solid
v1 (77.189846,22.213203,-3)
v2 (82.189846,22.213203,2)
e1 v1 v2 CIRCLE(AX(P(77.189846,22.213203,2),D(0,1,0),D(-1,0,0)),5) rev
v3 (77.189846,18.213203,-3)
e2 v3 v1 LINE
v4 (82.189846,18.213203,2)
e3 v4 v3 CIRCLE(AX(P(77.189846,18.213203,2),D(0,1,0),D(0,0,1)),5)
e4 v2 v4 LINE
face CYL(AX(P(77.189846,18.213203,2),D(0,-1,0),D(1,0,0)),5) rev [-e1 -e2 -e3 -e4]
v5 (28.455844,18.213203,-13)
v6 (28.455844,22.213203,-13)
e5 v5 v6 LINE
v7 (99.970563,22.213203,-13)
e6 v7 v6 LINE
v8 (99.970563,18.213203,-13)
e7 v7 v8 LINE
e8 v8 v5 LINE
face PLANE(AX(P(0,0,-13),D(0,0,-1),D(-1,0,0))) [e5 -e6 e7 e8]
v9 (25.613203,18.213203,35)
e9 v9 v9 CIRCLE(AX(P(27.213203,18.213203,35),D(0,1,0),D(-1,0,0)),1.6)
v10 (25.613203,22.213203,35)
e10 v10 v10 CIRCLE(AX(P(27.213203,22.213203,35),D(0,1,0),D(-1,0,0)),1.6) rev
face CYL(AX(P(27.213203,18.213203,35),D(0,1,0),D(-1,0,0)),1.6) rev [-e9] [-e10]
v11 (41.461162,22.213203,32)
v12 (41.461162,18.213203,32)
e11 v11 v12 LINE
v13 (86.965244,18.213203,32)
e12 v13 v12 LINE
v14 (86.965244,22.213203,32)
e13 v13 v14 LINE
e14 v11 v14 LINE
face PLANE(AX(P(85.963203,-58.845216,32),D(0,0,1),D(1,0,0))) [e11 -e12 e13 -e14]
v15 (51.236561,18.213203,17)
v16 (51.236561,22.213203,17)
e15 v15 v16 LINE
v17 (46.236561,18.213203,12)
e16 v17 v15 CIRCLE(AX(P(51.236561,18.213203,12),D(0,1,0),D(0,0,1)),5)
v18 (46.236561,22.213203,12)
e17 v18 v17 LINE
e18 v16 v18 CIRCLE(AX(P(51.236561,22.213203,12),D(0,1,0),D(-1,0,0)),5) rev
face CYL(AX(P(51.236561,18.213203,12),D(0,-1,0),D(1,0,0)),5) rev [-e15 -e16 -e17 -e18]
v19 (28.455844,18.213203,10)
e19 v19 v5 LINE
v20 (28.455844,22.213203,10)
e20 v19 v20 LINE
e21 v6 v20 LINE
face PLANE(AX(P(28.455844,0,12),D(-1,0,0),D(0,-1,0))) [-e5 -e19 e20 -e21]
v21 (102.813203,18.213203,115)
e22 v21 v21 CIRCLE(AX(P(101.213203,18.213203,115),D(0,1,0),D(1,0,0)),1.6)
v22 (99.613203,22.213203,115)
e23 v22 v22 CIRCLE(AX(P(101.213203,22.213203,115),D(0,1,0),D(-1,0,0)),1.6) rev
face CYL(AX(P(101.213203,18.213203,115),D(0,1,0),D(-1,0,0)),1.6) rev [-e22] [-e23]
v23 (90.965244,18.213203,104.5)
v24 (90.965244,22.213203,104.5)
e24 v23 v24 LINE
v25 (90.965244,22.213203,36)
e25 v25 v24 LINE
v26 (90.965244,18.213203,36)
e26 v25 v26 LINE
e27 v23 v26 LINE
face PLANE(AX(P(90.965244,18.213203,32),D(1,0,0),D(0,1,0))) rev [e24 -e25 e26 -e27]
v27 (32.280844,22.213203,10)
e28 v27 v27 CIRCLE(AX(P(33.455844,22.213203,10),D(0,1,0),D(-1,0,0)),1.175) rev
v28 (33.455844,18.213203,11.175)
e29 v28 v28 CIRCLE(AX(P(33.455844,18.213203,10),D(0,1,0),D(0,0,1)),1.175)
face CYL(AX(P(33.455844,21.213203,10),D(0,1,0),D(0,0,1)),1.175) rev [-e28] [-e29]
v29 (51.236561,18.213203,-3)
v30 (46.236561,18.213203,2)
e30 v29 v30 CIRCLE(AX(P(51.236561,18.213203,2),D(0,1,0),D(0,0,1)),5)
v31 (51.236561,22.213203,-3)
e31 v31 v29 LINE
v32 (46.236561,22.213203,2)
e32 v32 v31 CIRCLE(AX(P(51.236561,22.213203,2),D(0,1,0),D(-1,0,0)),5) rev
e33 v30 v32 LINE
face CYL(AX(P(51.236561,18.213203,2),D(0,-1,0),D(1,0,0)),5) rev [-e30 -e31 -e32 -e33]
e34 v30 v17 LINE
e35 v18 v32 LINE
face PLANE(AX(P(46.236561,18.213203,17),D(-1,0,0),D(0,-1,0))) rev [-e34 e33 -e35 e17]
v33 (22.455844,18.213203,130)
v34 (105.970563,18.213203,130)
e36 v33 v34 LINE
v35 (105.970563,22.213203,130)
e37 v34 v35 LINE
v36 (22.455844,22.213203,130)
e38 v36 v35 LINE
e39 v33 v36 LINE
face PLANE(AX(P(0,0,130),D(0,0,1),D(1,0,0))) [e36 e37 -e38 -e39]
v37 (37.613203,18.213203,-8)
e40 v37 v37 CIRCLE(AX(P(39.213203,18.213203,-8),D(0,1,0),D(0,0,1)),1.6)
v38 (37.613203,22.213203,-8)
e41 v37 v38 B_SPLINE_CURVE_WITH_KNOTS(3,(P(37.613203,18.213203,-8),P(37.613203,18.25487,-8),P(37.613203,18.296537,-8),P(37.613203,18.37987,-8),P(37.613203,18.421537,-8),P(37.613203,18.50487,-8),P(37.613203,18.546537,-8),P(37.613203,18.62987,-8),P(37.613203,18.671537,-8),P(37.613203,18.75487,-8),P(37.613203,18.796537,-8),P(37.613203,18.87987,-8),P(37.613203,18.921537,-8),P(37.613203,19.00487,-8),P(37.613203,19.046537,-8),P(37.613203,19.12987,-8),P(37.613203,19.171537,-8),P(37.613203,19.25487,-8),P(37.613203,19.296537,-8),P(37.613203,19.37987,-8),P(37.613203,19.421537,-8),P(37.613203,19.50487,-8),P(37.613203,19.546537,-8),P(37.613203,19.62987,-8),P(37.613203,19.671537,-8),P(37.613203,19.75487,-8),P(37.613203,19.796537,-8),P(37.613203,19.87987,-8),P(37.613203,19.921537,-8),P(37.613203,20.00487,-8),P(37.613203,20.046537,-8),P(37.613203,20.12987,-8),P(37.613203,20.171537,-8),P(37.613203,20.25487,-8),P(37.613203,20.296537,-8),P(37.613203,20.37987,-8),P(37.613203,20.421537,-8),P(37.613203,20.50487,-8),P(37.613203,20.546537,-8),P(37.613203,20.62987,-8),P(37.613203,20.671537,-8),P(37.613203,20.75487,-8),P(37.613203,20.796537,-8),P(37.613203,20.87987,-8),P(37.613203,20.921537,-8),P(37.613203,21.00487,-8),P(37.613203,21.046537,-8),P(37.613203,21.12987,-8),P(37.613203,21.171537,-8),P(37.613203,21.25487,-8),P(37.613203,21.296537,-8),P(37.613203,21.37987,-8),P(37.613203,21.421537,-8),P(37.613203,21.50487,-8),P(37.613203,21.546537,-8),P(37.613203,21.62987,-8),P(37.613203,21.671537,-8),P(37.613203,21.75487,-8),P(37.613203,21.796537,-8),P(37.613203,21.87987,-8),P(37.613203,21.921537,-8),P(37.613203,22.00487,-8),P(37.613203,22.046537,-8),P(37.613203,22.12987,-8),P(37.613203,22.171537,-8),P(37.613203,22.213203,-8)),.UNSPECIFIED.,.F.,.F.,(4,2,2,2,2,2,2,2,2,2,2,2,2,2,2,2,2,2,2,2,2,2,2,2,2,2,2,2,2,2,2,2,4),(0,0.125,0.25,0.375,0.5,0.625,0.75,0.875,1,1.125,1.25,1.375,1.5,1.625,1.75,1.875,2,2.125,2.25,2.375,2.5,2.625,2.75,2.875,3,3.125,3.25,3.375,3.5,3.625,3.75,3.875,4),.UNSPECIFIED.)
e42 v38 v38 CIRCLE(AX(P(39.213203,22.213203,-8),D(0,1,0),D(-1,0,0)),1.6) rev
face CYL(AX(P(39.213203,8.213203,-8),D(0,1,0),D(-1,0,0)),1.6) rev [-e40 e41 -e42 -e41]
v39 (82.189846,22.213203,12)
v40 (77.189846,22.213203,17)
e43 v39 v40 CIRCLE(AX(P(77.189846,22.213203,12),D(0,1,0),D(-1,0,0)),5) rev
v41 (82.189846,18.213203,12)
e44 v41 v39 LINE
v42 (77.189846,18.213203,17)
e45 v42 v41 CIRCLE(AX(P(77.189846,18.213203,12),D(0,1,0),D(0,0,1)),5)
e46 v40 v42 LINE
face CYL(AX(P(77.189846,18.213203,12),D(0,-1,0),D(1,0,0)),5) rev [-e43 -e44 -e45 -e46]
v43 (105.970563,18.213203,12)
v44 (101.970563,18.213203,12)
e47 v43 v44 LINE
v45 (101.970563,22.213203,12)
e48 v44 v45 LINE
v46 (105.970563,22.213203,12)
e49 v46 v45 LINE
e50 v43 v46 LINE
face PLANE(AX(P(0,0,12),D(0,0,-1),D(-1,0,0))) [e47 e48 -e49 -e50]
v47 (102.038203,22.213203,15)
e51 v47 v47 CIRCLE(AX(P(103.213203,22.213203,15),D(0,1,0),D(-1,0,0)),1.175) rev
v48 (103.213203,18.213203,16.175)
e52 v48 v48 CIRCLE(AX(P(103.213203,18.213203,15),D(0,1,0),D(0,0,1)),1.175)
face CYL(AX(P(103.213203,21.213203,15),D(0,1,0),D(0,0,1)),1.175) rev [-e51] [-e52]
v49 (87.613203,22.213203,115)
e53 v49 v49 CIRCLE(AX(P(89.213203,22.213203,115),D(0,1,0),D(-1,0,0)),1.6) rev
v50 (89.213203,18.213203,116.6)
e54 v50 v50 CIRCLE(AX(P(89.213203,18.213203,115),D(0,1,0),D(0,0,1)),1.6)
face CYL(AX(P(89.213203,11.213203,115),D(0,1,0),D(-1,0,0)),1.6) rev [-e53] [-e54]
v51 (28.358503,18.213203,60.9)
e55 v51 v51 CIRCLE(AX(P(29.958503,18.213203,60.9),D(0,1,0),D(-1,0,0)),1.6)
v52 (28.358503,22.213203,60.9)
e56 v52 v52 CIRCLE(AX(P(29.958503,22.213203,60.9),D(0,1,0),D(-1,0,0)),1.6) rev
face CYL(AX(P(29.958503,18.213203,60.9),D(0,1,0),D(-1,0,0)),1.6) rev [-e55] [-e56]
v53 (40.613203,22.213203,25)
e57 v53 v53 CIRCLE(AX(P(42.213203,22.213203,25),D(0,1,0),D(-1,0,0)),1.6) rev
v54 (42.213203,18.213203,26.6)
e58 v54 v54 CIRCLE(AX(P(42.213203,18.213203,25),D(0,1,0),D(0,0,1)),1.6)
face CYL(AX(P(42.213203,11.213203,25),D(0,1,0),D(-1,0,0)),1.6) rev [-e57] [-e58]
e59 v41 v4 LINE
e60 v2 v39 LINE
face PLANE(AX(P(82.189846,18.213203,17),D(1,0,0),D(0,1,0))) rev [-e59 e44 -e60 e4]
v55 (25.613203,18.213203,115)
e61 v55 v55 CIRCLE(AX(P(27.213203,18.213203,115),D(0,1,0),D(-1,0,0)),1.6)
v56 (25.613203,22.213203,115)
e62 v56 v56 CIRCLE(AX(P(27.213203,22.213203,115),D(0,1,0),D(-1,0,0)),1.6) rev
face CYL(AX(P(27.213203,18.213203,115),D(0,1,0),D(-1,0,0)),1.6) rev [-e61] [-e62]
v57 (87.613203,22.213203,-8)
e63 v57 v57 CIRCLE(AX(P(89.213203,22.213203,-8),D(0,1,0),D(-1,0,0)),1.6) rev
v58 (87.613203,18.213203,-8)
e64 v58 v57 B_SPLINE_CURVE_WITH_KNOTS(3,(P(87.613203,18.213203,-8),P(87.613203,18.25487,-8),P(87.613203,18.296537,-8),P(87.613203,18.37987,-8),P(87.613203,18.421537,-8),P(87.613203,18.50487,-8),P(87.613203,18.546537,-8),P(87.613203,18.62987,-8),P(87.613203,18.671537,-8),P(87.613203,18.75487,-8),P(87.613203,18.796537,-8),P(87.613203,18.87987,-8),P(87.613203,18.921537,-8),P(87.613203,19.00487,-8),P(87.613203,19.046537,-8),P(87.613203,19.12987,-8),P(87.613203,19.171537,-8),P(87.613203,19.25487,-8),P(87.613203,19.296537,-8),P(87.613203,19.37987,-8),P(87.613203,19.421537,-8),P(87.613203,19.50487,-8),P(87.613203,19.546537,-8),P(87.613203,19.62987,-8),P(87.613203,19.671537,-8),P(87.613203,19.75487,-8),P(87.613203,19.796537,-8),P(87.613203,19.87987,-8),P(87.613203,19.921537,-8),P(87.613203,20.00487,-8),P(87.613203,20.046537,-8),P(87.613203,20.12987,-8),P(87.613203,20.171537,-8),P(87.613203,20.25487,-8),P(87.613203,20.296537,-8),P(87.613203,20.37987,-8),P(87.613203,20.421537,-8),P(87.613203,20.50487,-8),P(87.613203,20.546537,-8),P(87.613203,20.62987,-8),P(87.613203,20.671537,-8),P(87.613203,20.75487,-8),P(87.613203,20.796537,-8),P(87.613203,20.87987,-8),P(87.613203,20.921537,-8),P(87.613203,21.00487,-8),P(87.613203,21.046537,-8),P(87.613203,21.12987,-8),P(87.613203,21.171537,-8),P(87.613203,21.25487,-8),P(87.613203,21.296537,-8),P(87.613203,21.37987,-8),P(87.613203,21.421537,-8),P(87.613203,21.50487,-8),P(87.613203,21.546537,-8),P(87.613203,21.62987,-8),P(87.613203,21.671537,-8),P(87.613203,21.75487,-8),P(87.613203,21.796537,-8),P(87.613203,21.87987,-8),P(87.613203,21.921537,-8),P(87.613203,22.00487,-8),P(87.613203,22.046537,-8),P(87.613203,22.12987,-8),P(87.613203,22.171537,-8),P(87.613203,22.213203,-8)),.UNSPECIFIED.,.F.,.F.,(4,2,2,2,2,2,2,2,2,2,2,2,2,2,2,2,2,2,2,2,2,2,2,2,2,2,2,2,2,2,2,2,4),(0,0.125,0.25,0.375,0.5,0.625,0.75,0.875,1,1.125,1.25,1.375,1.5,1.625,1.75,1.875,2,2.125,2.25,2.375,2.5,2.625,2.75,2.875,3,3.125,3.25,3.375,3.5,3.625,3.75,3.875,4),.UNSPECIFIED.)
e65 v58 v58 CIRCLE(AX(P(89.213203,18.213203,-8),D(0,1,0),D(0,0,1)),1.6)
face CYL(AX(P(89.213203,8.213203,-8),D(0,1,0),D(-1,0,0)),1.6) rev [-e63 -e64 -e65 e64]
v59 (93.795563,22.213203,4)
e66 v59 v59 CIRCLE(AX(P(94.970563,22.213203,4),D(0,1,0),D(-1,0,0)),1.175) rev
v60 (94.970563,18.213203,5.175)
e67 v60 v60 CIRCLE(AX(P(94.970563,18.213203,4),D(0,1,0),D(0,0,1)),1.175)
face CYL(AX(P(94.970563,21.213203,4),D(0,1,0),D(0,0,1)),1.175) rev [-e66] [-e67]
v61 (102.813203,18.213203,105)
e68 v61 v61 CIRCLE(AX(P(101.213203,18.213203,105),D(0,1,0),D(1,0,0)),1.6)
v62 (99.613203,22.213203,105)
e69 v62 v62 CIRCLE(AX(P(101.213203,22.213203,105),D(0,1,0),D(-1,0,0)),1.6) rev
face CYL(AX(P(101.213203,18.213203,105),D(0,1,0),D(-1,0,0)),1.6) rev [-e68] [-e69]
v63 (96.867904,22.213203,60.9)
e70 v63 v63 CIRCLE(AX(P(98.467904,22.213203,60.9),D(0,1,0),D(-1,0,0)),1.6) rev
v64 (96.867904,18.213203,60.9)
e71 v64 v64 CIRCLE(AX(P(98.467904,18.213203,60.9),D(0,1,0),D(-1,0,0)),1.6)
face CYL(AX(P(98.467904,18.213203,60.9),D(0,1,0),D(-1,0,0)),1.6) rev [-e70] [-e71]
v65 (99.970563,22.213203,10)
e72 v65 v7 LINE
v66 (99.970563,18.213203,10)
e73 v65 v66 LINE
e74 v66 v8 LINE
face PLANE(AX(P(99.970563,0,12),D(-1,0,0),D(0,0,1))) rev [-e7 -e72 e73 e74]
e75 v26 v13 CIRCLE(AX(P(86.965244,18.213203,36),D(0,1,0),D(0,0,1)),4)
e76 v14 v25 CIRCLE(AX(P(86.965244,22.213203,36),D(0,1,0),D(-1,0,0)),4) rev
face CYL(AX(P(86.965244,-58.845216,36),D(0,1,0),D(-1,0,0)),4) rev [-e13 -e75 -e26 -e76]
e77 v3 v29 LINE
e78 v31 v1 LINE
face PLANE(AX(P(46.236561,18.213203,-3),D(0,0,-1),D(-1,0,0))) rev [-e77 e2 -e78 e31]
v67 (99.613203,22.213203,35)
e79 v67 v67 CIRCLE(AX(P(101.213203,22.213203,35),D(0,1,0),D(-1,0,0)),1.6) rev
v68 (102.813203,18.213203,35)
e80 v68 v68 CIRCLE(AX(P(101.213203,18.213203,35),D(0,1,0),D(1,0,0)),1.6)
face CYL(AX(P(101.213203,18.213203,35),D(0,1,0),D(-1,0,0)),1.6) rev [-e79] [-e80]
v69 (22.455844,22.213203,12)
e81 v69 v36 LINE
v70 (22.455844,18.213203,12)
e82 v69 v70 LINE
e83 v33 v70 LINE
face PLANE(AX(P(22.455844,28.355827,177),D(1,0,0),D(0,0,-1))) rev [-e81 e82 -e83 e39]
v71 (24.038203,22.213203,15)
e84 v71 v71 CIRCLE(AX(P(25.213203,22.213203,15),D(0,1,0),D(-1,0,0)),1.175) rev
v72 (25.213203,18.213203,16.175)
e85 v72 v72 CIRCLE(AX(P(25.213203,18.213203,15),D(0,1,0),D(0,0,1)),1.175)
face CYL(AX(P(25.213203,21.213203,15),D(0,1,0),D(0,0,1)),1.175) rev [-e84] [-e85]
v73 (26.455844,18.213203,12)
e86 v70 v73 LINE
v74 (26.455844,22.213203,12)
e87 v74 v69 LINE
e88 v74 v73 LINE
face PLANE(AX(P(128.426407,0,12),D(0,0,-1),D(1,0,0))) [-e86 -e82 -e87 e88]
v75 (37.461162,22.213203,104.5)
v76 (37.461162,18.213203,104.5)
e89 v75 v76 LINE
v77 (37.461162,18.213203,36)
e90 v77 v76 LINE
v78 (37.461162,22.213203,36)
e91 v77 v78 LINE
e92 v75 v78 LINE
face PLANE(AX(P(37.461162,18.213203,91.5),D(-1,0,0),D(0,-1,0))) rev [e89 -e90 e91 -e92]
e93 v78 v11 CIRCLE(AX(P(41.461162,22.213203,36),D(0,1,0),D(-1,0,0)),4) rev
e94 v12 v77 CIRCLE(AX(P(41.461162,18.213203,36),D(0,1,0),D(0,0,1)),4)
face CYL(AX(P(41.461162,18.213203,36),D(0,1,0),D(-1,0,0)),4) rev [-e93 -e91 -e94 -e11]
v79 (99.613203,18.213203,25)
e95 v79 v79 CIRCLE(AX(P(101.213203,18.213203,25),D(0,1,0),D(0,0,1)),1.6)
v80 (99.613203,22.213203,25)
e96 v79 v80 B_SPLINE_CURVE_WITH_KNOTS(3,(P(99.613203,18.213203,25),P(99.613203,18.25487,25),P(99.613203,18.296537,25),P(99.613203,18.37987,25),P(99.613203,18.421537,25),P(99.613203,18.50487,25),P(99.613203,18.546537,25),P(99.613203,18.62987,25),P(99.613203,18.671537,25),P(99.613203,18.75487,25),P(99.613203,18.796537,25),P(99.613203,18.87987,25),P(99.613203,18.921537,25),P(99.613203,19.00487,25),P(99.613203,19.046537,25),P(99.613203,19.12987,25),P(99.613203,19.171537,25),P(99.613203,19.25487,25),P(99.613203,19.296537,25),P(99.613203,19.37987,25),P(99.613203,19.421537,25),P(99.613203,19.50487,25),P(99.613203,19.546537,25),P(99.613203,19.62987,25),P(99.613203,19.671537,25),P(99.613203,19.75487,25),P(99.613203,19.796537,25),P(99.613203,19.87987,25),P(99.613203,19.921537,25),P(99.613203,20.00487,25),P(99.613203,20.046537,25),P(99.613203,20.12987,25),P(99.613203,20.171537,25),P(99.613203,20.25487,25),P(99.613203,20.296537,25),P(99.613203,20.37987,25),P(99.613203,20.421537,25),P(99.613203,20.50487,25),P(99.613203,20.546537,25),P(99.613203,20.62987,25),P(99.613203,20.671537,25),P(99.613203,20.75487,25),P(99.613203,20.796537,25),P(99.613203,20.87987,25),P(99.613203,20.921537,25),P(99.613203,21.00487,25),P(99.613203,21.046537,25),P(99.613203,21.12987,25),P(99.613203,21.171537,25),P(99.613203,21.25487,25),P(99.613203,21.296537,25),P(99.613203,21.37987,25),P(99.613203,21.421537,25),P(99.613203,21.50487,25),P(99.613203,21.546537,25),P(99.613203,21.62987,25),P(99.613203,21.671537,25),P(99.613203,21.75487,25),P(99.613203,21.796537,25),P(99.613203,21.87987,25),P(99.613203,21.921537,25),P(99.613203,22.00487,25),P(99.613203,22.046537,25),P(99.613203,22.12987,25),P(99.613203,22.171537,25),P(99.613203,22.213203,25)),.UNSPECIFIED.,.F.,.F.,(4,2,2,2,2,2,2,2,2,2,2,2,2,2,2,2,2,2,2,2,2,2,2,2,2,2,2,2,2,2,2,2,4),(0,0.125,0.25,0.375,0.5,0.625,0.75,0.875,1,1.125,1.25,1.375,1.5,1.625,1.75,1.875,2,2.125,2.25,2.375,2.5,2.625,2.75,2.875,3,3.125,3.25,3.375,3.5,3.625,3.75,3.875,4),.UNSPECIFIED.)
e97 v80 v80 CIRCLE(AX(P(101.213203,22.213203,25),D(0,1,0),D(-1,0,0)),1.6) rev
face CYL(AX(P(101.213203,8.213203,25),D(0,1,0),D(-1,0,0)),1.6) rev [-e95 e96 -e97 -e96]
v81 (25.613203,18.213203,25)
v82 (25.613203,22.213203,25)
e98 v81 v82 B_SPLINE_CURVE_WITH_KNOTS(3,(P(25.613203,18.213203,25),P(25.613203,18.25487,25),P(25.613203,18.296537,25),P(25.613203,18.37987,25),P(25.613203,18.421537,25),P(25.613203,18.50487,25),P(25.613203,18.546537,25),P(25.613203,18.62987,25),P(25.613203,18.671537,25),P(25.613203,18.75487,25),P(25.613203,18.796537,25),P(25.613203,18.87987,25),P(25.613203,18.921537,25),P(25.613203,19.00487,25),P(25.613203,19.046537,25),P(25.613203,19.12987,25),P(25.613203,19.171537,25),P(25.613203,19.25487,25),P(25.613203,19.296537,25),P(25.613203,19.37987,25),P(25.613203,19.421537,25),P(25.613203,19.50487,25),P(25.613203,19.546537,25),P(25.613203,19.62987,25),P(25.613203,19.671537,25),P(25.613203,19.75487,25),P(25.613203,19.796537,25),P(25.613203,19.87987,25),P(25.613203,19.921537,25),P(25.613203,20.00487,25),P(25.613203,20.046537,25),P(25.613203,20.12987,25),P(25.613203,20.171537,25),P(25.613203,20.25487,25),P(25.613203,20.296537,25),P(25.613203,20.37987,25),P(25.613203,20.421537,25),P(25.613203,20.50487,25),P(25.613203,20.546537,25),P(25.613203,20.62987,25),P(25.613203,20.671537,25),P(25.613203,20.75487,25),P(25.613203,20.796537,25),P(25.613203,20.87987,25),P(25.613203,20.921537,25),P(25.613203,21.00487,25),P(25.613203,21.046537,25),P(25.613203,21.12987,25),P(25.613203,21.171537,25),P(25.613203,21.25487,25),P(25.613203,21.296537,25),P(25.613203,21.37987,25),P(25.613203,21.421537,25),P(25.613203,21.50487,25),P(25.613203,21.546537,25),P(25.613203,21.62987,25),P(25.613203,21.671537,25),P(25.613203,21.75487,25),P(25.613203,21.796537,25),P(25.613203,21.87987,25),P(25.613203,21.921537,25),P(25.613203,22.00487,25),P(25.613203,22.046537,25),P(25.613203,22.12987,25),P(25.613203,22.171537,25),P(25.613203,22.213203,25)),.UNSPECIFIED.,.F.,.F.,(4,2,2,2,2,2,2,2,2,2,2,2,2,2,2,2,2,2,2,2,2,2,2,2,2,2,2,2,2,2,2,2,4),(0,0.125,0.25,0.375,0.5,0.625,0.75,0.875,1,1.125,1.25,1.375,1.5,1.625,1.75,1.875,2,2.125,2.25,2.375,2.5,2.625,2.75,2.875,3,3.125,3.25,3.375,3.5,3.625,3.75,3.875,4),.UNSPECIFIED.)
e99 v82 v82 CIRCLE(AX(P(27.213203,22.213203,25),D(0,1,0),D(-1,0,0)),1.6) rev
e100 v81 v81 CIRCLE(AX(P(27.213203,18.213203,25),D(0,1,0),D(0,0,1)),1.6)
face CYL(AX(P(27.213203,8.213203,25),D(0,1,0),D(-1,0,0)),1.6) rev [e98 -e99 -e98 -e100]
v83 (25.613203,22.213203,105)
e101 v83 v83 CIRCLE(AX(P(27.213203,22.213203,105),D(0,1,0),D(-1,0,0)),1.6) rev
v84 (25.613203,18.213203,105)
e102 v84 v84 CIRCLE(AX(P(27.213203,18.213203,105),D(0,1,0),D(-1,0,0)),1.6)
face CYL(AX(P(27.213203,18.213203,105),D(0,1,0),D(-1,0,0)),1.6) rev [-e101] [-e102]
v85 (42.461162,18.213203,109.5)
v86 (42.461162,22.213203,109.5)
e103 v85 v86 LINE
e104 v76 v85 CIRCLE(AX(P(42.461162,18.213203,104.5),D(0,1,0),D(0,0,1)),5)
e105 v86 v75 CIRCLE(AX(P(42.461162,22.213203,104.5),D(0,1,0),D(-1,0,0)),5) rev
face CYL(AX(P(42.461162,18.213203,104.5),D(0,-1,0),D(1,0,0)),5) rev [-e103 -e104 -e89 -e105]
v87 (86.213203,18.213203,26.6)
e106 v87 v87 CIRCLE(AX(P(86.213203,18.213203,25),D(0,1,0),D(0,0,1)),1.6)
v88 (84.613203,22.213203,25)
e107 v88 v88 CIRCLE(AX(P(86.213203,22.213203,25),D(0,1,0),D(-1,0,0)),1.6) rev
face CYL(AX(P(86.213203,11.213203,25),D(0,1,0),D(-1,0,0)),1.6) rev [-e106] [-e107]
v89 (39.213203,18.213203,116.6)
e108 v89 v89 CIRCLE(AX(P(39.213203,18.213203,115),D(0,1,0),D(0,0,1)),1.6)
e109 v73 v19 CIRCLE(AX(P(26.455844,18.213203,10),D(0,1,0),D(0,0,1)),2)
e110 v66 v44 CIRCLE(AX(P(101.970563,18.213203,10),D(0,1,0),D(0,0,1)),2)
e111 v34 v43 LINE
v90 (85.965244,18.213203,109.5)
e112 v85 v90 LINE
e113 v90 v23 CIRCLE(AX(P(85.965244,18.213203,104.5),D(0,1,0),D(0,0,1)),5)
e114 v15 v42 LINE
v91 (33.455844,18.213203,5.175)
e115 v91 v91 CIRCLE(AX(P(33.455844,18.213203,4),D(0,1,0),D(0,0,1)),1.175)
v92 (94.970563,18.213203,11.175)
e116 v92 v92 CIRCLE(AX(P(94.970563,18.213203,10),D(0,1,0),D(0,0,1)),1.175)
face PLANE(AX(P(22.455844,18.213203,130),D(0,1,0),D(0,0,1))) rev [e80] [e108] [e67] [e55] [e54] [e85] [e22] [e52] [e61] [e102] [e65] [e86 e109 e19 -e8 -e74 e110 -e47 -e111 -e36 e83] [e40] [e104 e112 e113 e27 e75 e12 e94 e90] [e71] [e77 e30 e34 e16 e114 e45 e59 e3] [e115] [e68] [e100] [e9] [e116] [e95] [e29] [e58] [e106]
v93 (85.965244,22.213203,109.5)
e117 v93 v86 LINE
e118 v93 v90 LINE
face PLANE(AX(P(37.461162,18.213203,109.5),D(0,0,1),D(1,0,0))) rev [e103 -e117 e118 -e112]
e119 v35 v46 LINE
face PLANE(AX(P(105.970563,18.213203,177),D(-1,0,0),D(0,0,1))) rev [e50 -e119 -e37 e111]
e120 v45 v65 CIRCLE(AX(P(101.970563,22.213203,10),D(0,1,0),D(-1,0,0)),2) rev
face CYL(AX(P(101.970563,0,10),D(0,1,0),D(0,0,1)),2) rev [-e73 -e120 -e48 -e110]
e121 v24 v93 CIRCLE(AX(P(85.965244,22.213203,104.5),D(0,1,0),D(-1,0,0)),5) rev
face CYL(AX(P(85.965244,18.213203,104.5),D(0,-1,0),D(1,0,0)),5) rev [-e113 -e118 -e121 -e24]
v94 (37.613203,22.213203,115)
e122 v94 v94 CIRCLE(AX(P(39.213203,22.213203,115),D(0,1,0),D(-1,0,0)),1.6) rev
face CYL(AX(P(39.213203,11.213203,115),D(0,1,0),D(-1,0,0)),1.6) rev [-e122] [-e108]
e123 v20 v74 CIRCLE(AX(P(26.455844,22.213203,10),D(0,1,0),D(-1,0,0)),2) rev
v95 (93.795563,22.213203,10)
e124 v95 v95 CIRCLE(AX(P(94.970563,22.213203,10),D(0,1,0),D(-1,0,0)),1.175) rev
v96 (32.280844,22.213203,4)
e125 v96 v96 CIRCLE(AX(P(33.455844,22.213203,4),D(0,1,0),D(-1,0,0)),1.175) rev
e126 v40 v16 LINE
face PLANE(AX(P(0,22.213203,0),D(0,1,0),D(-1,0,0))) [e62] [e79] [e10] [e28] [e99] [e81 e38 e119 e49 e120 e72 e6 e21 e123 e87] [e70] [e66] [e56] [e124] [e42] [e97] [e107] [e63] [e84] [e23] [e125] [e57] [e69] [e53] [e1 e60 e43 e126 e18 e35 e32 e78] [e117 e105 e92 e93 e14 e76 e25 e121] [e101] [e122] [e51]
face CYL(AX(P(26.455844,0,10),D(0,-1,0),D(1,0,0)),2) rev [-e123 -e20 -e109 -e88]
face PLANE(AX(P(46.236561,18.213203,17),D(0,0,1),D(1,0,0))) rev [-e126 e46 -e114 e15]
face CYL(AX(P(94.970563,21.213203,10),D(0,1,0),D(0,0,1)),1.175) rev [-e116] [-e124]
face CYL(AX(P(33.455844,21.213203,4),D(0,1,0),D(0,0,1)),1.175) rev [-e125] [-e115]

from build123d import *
from build123d.topology import SkipClean

# Parameters (mm, degrees)
EXTRUDE_1_DEPTH           = 130
HOLE_WIZARD_2_2_2_2_1_D   = 2.2
HOLE_WIZARD_2_2_2_2_2_D   = 2.2
CUT_EXTRUDE_1_DEPTH       = 12
CUT_EXTRUDE_5_DEPTH       = 20
HOLE_WIZARD_2_35_2_35_1_D = 2.35
CUT_EXTRUDE_6_DEPTH       = 10
SKETCH1_W                 = 22.455844123
SKETCH1_H                 = 22.319185646
EXTRUDE1_DEPTH            = 165
SKETCH3_W                 = 71.514718625
SKETCH3_H                 = 3
EXTRUDE3_DEPTH            = 13
SKETCH4_R                 = 1.6
EXTRUDE4_DEPTH            = 13
SKETCH6_R                 = 1.6
EXTRUDE5_DEPTH            = 13
SKETCH_21_R               = 1.6
CUT_EXTRUDE_7_DEPTH       = 10
SKETCH_22_W               = 43.5
SKETCH_22_H               = 65.5
CUT_EXTRUDE_8_DEPTH       = 10
EXTRUDE_3_DEPTH           = 3
FILLET_1_R                = 10
CUT_EXTRUDE_9_DEPTH       = 10
EXTRUDE_START             = -3
SKETCH_25_R               = 1.1
EXTRUDE_4_DEPTH           = 3
FILLET_2_R                = 5
SKETCH_26_W               = 35.953284367
SKETCH_26_H               = 20
CUT_EXTRUDE_10_DEPTH      = 3
FILLET_3_R                = 5
SKETCH_27_R               = 1.6
CUT_EXTRUDE_11_DEPTH      = 3
EXTRUDE_5_DEPTH           = 3
CUT_EXTRUDE_12_DEPTH      = 3
FILLET_4_R                = 4
SKETCH_30_R               = 1.6
CUT_EXTRUDE_13_DEPTH      = 3
SKETCH_31_R               = 1.6
CUT_EXTRUDE_14_DEPTH      = 10
SKETCH_32_W               = 2
SKETCH_32_H               = 20
EXTRUDE_6_DEPTH           = 3
FILLET_5_R                = 5
SKETCH_33_R               = 1.6
CUT_EXTRUDE_15_DEPTH      = 3
SKETCH_34_R               = 1.6
EXTRUDE_7_DEPTH           = 3
EXTRUDE_START_2           = 1
SKETCH_37_R               = 1.175
SKETCH_37_R_2             = 1.6
EXTRUDE_8_DEPTH           = 1
FILLET_6_R                = 2


with BuildPart() as part:
    # 草图1 → 凸台-拉伸1 (new body)
    with BuildSketch(Plane.XY):
        Polygon((21.213203436, 21.213203436), (107.213203436, 21.213203436), (115.213203436, 13.213203436), (110.970562748, 13.213203436), (105.970562748, 18.213203436), (22.455844123, 18.213203436), (17.455844123, 13.213203436), (13.213203436, 13.213203436), align=None)
    extrude(amount=EXTRUDE_1_DEPTH)

    # Ø2.2 (2.2) 直径孔1 (through all)
    with Locations(Plane(origin=(0, 0, 0), x_dir=(0, 0, 1), z_dir=(-0.7071067811865488, 0.7071067811865462, 0))):
        with Locations((65, 25), (25, 25), (105, 25)):
            hole_wizard_2_2_2_2_1 = Hole(HOLE_WIZARD_2_2_2_2_1_D / 2)

    # 镜向1: Ø2.2 (2.2) 直径孔1 across plane
    add(hole_wizard_2_2_2_2_1.mirror(Plane(origin=(64.213203436, 0, 0), x_dir=(0, 0, 1), z_dir=(1, 0, 0))), mode=Mode.SUBTRACT)

    # Ø2.2 (2.2) 直径孔2 (through all)
    with Locations(Plane(origin=(0, 21.213203436, 0), x_dir=(1, 0, 0), z_dir=(0, 1, 0))):
        with Locations((39.213203436, -115), (39.213203436, -75), (89.213203436, -75), (89.213203436, -115)):
            Hole(HOLE_WIZARD_2_2_2_2_2_D / 2)

    # 草图6 → 切除-拉伸1 (cut)
    with BuildSketch(Plane(origin=(0, 0, 0), x_dir=(-1, 0, 0), z_dir=(0, 0, -1))):
        Polygon((-99.970562748, 21.213203436), (-107.213203436, 21.213203436), (-105.970562748, 18.213203436), (-99.970562748, 18.213203436), align=None)
        Polygon((-105.970562748, 18.213203436), (-107.213203436, 21.213203436), (-115.213203436, 13.213203436), (-113.091883092, 11.091883092), align=None)
    cut_extrude_1 = extrude(amount=-CUT_EXTRUDE_1_DEPTH, mode=Mode.SUBTRACT)

    # 草图14 → 切除-拉伸5 (cut)
    with BuildSketch(Plane.XY.offset(130)):
        Polygon((103.970562748, 18.213203436), (103.970562748, 21.213203436), (107.213203436, 21.213203436), (115.213203436, 13.213203436), (110.970562748, 13.213203436), (105.970562748, 18.213203436), align=None)
    cut_extrude_5 = extrude(amount=-CUT_EXTRUDE_5_DEPTH, mode=Mode.SUBTRACT)

    # Ø2.35 (2.35) 直径孔1 (through all)
    with Locations(Plane(origin=(0, 21.213203436, 0), x_dir=(1, 0, 0), z_dir=(0, 1, 0))):
        with Locations((94.970562748, -4), (103.213203436, -15), (94.970562748, -10)):
            hole_wizard_2_35_2_35_1 = Hole(HOLE_WIZARD_2_35_2_35_1_D / 2)

    # 镜向2: 切除-拉伸1, 切除-拉伸5, Ø2.35 (2.35) 直径孔1 across plane
    add(cut_extrude_1.mirror(Plane(origin=(64.213203436, 0, 0), x_dir=(0, 0, 1), z_dir=(1, 0, 0))), mode=Mode.SUBTRACT)
    add(cut_extrude_5.mirror(Plane(origin=(64.213203436, 0, 0), x_dir=(0, 0, 1), z_dir=(1, 0, 0))), mode=Mode.SUBTRACT)
    add(hole_wizard_2_35_2_35_1.mirror(Plane(origin=(64.213203436, 0, 0), x_dir=(0, 0, 1), z_dir=(1, 0, 0))), mode=Mode.SUBTRACT)

    # 草图15 → 切除-拉伸6 (cut)
    with BuildSketch(Plane(origin=(0, 21.213203436, 0), x_dir=(1, 0, 0), z_dir=(0, 1, 0))):
        with BuildLine():
            Line((27.213203436, -18), (101.213203436, -18))
            ThreePointArc((101.213203436, -18), (102.713203436, -19.5), (101.213203436, -21))
            Line((101.213203436, -21), (27.213203436, -21))
            ThreePointArc((27.213203436, -21), (25.713203436, -19.5), (27.213203436, -18))
        make_face()
        with BuildLine():
            Line((27.213203436, -29), (101.213203436, -29))
            ThreePointArc((101.213203436, -29), (102.713203436, -30.5), (101.213203436, -32))
            Line((101.213203436, -32), (27.213203436, -32))
            ThreePointArc((27.213203436, -32), (25.713203436, -30.5), (27.213203436, -29))
        make_face()
        with BuildLine():
            Line((27.213203436, -40), (101.213203436, -40))
            ThreePointArc((101.213203436, -40), (102.713203436, -41.5), (101.213203436, -43))
            Line((101.213203436, -43), (27.213203436, -43))
            ThreePointArc((27.213203436, -43), (25.713203436, -41.5), (27.213203436, -40))
        make_face()
        with BuildLine():
            Line((27.213203436, -51), (101.213203436, -51))
            ThreePointArc((101.213203436, -51), (102.713203436, -52.5), (101.213203436, -54))
            Line((101.213203436, -54), (27.213203436, -54))
            ThreePointArc((27.213203436, -54), (25.713203436, -52.5), (27.213203436, -51))
        make_face()
        with BuildLine():
            Line((27.213203436, -62), (101.213203436, -62))
            ThreePointArc((101.213203436, -62), (102.713203436, -63.5), (101.213203436, -65))
            Line((101.213203436, -65), (27.213203436, -65))
            ThreePointArc((27.213203436, -65), (25.713203436, -63.5), (27.213203436, -62))
        make_face()
        with BuildLine():
            Line((27.213203436, -77.5), (101.213203436, -77.5))
            ThreePointArc((101.213203436, -77.5), (102.713203436, -79), (101.213203436, -80.5))
            Line((101.213203436, -80.5), (27.213203436, -80.5))
            ThreePointArc((27.213203436, -80.5), (25.713203436, -79), (27.213203436, -77.5))
        make_face()
        with BuildLine():
            Line((27.213203436, -91.5), (101.213203436, -91.5))
            ThreePointArc((101.213203436, -91.5), (102.713203436, -93), (101.213203436, -94.5))
            Line((101.213203436, -94.5), (27.213203436, -94.5))
            ThreePointArc((27.213203436, -94.5), (25.713203436, -93), (27.213203436, -91.5))
        make_face()
        with BuildLine():
            Line((27.213203436, -105.5), (101.213203436, -105.5))
            ThreePointArc((101.213203436, -105.5), (102.713203436, -107), (101.213203436, -108.5))
            Line((101.213203436, -108.5), (27.213203436, -108.5))
            ThreePointArc((27.213203436, -108.5), (25.713203436, -107), (27.213203436, -105.5))
        make_face()
    extrude(amount=-CUT_EXTRUDE_6_DEPTH, mode=Mode.SUBTRACT)

    # Sketch1 → Extrude1 (cut)
    with BuildSketch(Plane(origin=(0, 0, 12), x_dir=(-1, 0, 0), z_dir=(0, 0, -1))):
        Polygon((-105.970562748, 18.213203436), (-105.970562748, 28.355826894), (-119.630928902, 28.355826894), (-119.630928902, 18.213203436), (-119.630928902, 5.364047477), (-105.970562748, 5.364047477), align=None)
        with Locations((-11.227922062, 17.196234071)):
            Rectangle(SKETCH1_W, SKETCH1_H)
    extrude(amount=-EXTRUDE1_DEPTH, mode=Mode.SUBTRACT)

    # Sketch3 → Extrude3 (add)
    with BuildSketch(Plane(origin=(0, 0, 0), x_dir=(-1, 0, 0), z_dir=(0, 0, -1))):
        with Locations((-64.213203436, 19.713203436)):
            Rectangle(SKETCH3_W, SKETCH3_H)
    extrude(amount=EXTRUDE3_DEPTH)

    # Sketch4 → Extrude4 (cut)
    with BuildSketch(Plane(origin=(0, 21.213203436, 0), x_dir=(1, 0, 0), z_dir=(0, 1, 0))):
        with Locations(Location((89.213203436, 8, 0), (0, 0, 180))):
            Circle(SKETCH4_R)
        with Locations(Location((39.213203436, 8, 0), (0, 0, 180))):
            Circle(SKETCH4_R)
    extrude(amount=-EXTRUDE4_DEPTH, mode=Mode.SUBTRACT)

    # Sketch6 → Extrude5 (cut)
    with BuildSketch(Plane(origin=(0, 21.213203436, 0), x_dir=(1, 0, 0), z_dir=(0, 1, 0))):
        with Locations(Location((101.213203436, -25, 0), (0, 0, 180))):
            Circle(SKETCH6_R)
        with Locations(Location((101.213203436, -47, 0), (0, 0, 180))):
            Circle(SKETCH6_R)
        with Locations(Location((101.213203436, -71.25, 0), (0, 0, 180))):
            Circle(SKETCH6_R)
        with Locations(Location((101.213203436, -100, 0), (0, 0, 180))):
            Circle(SKETCH6_R)
        with Locations(Location((27.213203436, -100, 0), (0, 0, 180))):
            Circle(SKETCH6_R)
        with Locations(Location((27.213203436, -71.25, 0), (0, 0, 180))):
            Circle(SKETCH6_R)
        with Locations(Location((27.213203436, -47, 0), (0, 0, 180))):
            Circle(SKETCH6_R)
        with Locations(Location((27.213203436, -25, 0), (0, 0, 180))):
            Circle(SKETCH6_R)
    extrude(amount=-EXTRUDE5_DEPTH, mode=Mode.SUBTRACT)

    # 草图21 → 切除-拉伸7 (cut)
    with BuildSketch(Plane(origin=(0, 21.213203436, 0), x_dir=(1, 0, 0), z_dir=(0, 1, 0))):
        with Locations(Location((86.213203436, -25, 0), (0, 0, 180))):
            Circle(SKETCH_21_R)
        with Locations(Location((42.213203436, -25, 0), (0, 0, 270))):
            Circle(SKETCH_21_R)
    extrude(amount=-CUT_EXTRUDE_7_DEPTH, mode=Mode.SUBTRACT)

    # 草图22 → 切除-拉伸8 (cut)
    with BuildSketch(Plane(origin=(0, 21.213203436, 0), x_dir=(1, 0, 0), z_dir=(0, 1, 0))):
        with Locations((64.213203436, -61.75)):
            Rectangle(SKETCH_22_W, SKETCH_22_H)
    extrude(amount=-CUT_EXTRUDE_8_DEPTH, mode=Mode.SUBTRACT)

    # 草图23 → 凸台-拉伸3 (add)
    with BuildSketch(Plane(origin=(0, 21.213203436, 0), x_dir=(1, 0, 0), z_dir=(0, 1, 0))):
        with BuildLine():
            Line((101.213203436, -91.5), (85.963203436, -91.5))
            Line((85.963203436, -91.5), (42.463203436, -91.5))
            Line((42.463203436, -91.5), (27.213203436, -91.5))
            ThreePointArc((27.213203436, -91.5), (25.713203436, -93), (27.213203436, -94.5))
            Line((27.213203436, -94.5), (101.213203436, -94.5))
            ThreePointArc((101.213203436, -94.5), (102.713203436, -93), (101.213203436, -91.5))
        make_face()
        with BuildLine():
            Line((27.213203436, -32), (42.463203436, -32))
            Line((42.463203436, -32), (85.963203436, -32))
            Line((85.963203436, -32), (101.213203436, -32))
            ThreePointArc((101.213203436, -32), (102.713203436, -30.5), (101.213203436, -29))
            Line((101.213203436, -29), (27.213203436, -29))
            ThreePointArc((27.213203436, -29), (25.713203436, -30.5), (27.213203436, -32))
        make_face()
        with BuildLine():
            Line((101.213203436, -18), (27.213203436, -18))
            ThreePointArc((27.213203436, -18), (25.713203436, -19.5), (27.213203436, -21))
            Line((27.213203436, -21), (101.213203436, -21))
            ThreePointArc((101.213203436, -21), (102.713203436, -19.5), (101.213203436, -18))
        make_face()
        with BuildLine():
            Line((101.213203436, -105.5), (27.213203436, -105.5))
            ThreePointArc((27.213203436, -105.5), (25.713203436, -107), (27.213203436, -108.5))
            Line((27.213203436, -108.5), (101.213203436, -108.5))
            ThreePointArc((101.213203436, -108.5), (102.713203436, -107), (101.213203436, -105.5))
        make_face()
    extrude(amount=-EXTRUDE_3_DEPTH)

    # 圆角1
    # the kernel refuses this fillet: 10 mm, written as the material it adds along each edge
    with BuildSketch(Plane(origin=(42.463203436, 21.213203436, 32), x_dir=(0, 0, 1), z_dir=(0, -1, 0)), Plane(origin=(85.963203436, 18.213203436, 32), x_dir=(0, 0, 1), z_dir=(0, 1, 0))) as fillet_1_piece_1:
        with BuildLine():
            CenterArc((10, -9.797958971), FILLET_1_R, 101.536959033, 78.463040967)
            Line((0, -9.797958971), (-0.2, -9.797958971))
            Line((-0.2, -9.797958971), (-0.2, 0))
            Line((-0.2, 0), (0, 0.2))
            ThreePointArc((0, 0.2), (4, 0.2), (7.96, 0.195959179))
            Line((7.96, 0.195959179), (8, 0))
        make_face()
    extrude(amount=3)
    with BuildSketch(Plane(origin=(85.963203436, 21.213203436, 91.5), x_dir=(0, 0, -1), z_dir=(0, -1, 0)), Plane(origin=(42.463203436, 18.213203436, 91.5), x_dir=(0, 0, -1), z_dir=(0, 1, 0))) as fillet_1_piece_2:
        with BuildLine():
            CenterArc((FILLET_1_R, -FILLET_1_R), FILLET_1_R, 90, 90)
            Line((0, -FILLET_1_R), (-FILLET_1_R * 0.02, -FILLET_1_R))
            Line((-FILLET_1_R * 0.02, -FILLET_1_R), (-FILLET_1_R * 0.02, FILLET_1_R * 0.02))
            Line((-FILLET_1_R * 0.02, FILLET_1_R * 0.02), (FILLET_1_R, FILLET_1_R * 0.02))
            Line((FILLET_1_R, FILLET_1_R * 0.02), (FILLET_1_R, 0))
        make_face()
    extrude(amount=3)

    # 草图24 → 切除-拉伸9 (cut)
    with BuildSketch(Plane(origin=(0, 21.213203436, 0), x_dir=(1, 0, 0), z_dir=(0, 1, 0))):
        with BuildLine():
            Line((25.713203436, -52.5), (25.713203436, -63.5))
            ThreePointArc((25.713203436, -63.5), (26.152543264, -64.560660172), (27.213203436, -65))
            Line((27.213203436, -65), (101.213203436, -65))
            ThreePointArc((101.213203436, -65), (102.273863607, -64.560660172), (102.713203436, -63.5))
            Line((102.713203436, -63.5), (102.713203436, -52.5))
            ThreePointArc((102.713203436, -52.5), (102.273863607, -51.439339828), (101.213203436, -51))
            Line((101.213203436, -51), (27.213203436, -51))
            ThreePointArc((27.213203436, -51), (26.152543264, -51.439339828), (25.713203436, -52.5))
        make_face()
    extrude(amount=-CUT_EXTRUDE_9_DEPTH, mode=Mode.SUBTRACT)

    # 草图25 → 凸台-拉伸4 (add)
    with BuildSketch(Plane(origin=(0, 21.213203436, 0), x_dir=(1, 0, 0), z_dir=(0, 1, 0)).offset(EXTRUDE_START)):
        with Locations((39.213203436, -75)):
            Circle(SKETCH_25_R)
        with Locations((89.213203436, -75)):
            Circle(SKETCH_25_R)
    extrude(amount=EXTRUDE_4_DEPTH)

    # 圆角2
    # the kernel refuses this fillet: 5 mm, written as the material it takes off along each edge
    with BuildSketch(Plane(origin=(85.963203436, 33.713203436, 77.5), x_dir=(1, 0, 0), z_dir=(0, -1, 0)), Plane(origin=(85.963203436, 33.713203436, 51), x_dir=(1, 0, 0), z_dir=(0, -1, 0)), Plane(origin=(42.463203436, 33.713203436, 65), x_dir=(-1, 0, 0), z_dir=(0, -1, 0)), Plane(origin=(42.463203436, 33.713203436, 43), x_dir=(-1, 0, 0), z_dir=(0, -1, 0))) as fillet_2_piece_1:
        with BuildLine():
            CenterArc((FILLET_2_R, -FILLET_2_R), FILLET_2_R, 90, 90)
            Line((0, -FILLET_2_R), (0, 0))
            Line((0, 0), (FILLET_2_R, 0))
        make_face()
    extrude(amount=28, mode=Mode.SUBTRACT)
    with BuildSketch(Plane(origin=(85.963203436, 5.713203436, 65), x_dir=(0, 0, 1), z_dir=(0, 1, 0)), Plane(origin=(85.963203436, 5.713203436, 43), x_dir=(0, 0, 1), z_dir=(0, 1, 0)), Plane(origin=(42.463203436, 5.713203436, 77.5), x_dir=(0, 0, -1), z_dir=(0, 1, 0)), Plane(origin=(42.463203436, 5.713203436, 51), x_dir=(0, 0, -1), z_dir=(0, 1, 0))) as fillet_2_piece_2:
        with BuildLine():
            CenterArc((FILLET_2_R, FILLET_2_R), FILLET_2_R, 180, 90)
            Line((0, FILLET_2_R), (0, 0))
            Line((0, 0), (FILLET_2_R, 0))
        make_face()
    extrude(amount=28, mode=Mode.SUBTRACT)

    # 草图26 → 切除-拉伸10 (cut)
    with BuildSketch(Plane(origin=(0, 21.213203436, 0), x_dir=(1, 0, 0), z_dir=(0, 1, 0))):
        with Locations((64.213203436, -7)):
            Rectangle(SKETCH_26_W, SKETCH_26_H)
    extrude(amount=-CUT_EXTRUDE_10_DEPTH, mode=Mode.SUBTRACT)

    # 圆角3
    fillet_3_edges = [part.edges().sort_by_distance(p)[0] for p in [
        (82.189845619, 19.713203436, -3),
        (82.189845619, 19.713203436, 17),
        (46.236561252, 19.713203436, 17),
        (46.236561252, 19.713203436, -3),
    ]]
    fillet(fillet_3_edges, radius=FILLET_3_R)

    # 草图27 → 切除-拉伸11 (cut)
    with BuildSketch(Plane(origin=(0, 21.213203436, 0), x_dir=(1, 0, 0), z_dir=(0, 1, 0))):
        with Locations(Location((27.213203436, -90, 0), (0, 0, 180))):
            Circle(SKETCH_27_R)
        with Locations(Location((27.213203436, -35, 0), (0, 0, 180))):
            Circle(SKETCH_27_R)
        with Locations((101.213203436, -90)):
            Circle(SKETCH_27_R)
        with Locations((101.213203436, -35)):
            Circle(SKETCH_27_R)
    extrude(amount=-CUT_EXTRUDE_11_DEPTH, mode=Mode.SUBTRACT)

    # 草图28 → 凸台-拉伸5 (add)
    with BuildSketch(Plane(origin=(0, 21.213203436, 0), x_dir=(1, 0, 0), z_dir=(0, 1, 0))):
        Polygon((42.463203436, -40), (42.463203436, -80.5), (42.463203436, -83.552465137), (23.442871373, -83.552465137), (23.442871373, -40), (25.473566538, -40), align=None)
        Polygon((85.963203436, -83.552465137), (85.963203436, -80.5), (85.963203436, -40), (102.952840334, -40), (104.983535498, -40), (104.983535498, -83.552465137), align=None)
    extrude(amount=-EXTRUDE_5_DEPTH)

    # 草图29 → 切除-拉伸12 (cut)
    with BuildSketch(Plane(origin=(0, 21.213203436, 0), x_dir=(1, 0, 0), z_dir=(0, 1, 0))):
        Polygon((52.261162407, -32), (37.461162407, -32), (37.461162407, -91.5), (37.461162407, -109.5), (90.965244464, -109.5), (90.965244464, -91.5), (90.965244464, -32), (76.165244464, -32), align=None)
    extrude(amount=-CUT_EXTRUDE_12_DEPTH, mode=Mode.SUBTRACT)

    # 圆角4
    fillet_4_edges = [part.edges().sort_by_distance(p)[0] for p in [
        (37.461162407, 19.713203436, 32),
        (90.965244464, 19.713203436, 32),
    ]]
    fillet(fillet_4_edges, radius=FILLET_4_R)

    # 草图30 → 切除-拉伸13 (cut)
    with BuildSketch(Plane(origin=(0, 21.213203436, 0), x_dir=(1, 0, 0), z_dir=(0, 1, 0))):
        with Locations(Location((29.958503265, -60.9, 0), (0, 0, 180))):
            Circle(SKETCH_30_R)
        with Locations(Location((98.467903606, -60.9, 0), (0, 0, 180))):
            Circle(SKETCH_30_R)
    extrude(amount=-CUT_EXTRUDE_13_DEPTH, mode=Mode.SUBTRACT)

    # 草图31 → 切除-拉伸14 (cut)
    with BuildSketch(Plane(origin=(0, 21.213203436, 0), x_dir=(1, 0, 0), z_dir=(0, 1, 0))):
        with Locations(Location((39.213203436, -115, 0), (0, 0, 180))):
            Circle(SKETCH_31_R)
        with Locations(Location((89.213203436, -115, 0), (0, 0, 180))):
            Circle(SKETCH_31_R)
    extrude(amount=-CUT_EXTRUDE_14_DEPTH, mode=Mode.SUBTRACT)

    # 草图32 → 凸台-拉伸6 (add)
    with BuildSketch(Plane(origin=(0, 21.213203436, 0), x_dir=(1, 0, 0), z_dir=(0, 1, 0))):
        with Locations((23.455844123, -120)):
            Rectangle(SKETCH_32_W, SKETCH_32_H)
        with Locations((104.970562748, -120)):
            Rectangle(SKETCH_32_W, SKETCH_32_H)
    extrude(amount=-EXTRUDE_6_DEPTH)

    # 圆角5
    fillet_5_edges = [part.edges().sort_by_distance(p)[0] for p in [
        (90.965244464, 19.713203436, 109.5),
        (37.461162407, 19.713203436, 109.5),
    ]]
    fillet(fillet_5_edges, radius=FILLET_5_R)

    # 草图33 → 切除-拉伸15 (cut)
    with BuildSketch(Plane(origin=(0, 21.213203436, 0), x_dir=(1, 0, 0), z_dir=(0, 1, 0))):
        with Locations(Location((27.213203436, -115, 0), (0, 0, 180))):
            Circle(SKETCH_33_R)
        with Locations(Location((27.213203436, -105, 0), (0, 0, 180))):
            Circle(SKETCH_33_R)
        with Locations((101.213203436, -105)):
            Circle(SKETCH_33_R)
        with Locations((101.213203436, -115)):
            Circle(SKETCH_33_R)
    extrude(amount=-CUT_EXTRUDE_15_DEPTH, mode=Mode.SUBTRACT)

    # 草图34 → 凸台-拉伸7 (add)
    with BuildSketch(Plane(origin=(0, 21.213203436, 0), x_dir=(1, 0, 0), z_dir=(0, 1, 0))):
        with Locations((101.213203436, -100)):
            Circle(SKETCH_34_R)
        with Locations((101.213203436, -90)):
            Circle(SKETCH_34_R)
        with Locations((27.213203436, -90)):
            Circle(SKETCH_34_R)
        with Locations((27.213203436, -100)):
            Circle(SKETCH_34_R)
    extrude(amount=-EXTRUDE_7_DEPTH)

    # 草图37 → 凸台-拉伸8 (add)
    with SkipClean():  # the faces are left unmerged after this step: merging them gives an invalid solid
        with BuildSketch(Plane(origin=(0, 21.213203436, 0), x_dir=(1, 0, 0), z_dir=(0, 1, 0)).offset(EXTRUDE_START_2)):
            Polygon((99.970562748, 13), (28.455844123, 13), (28.455844123, -12), (22.455844123, -12), (22.455844123, -130), (105.970562748, -130), (105.970562748, -12), (99.970562748, -12), align=None)
            with Locations(Location((25.213203436, -15, 0), (0, 0, 270))):
                Circle(SKETCH_37_R, mode=Mode.SUBTRACT)
            with Locations(Location((103.213203436, -15, 0), (0, 0, 270))):
                Circle(SKETCH_37_R, mode=Mode.SUBTRACT)
            with Locations(Location((94.970562748, -10, 0), (0, 0, 270))):
                Circle(SKETCH_37_R, mode=Mode.SUBTRACT)
            with Locations(Location((94.970562748, -4, 0), (0, 0, 270))):
                Circle(SKETCH_37_R, mode=Mode.SUBTRACT)
            with Locations(Location((33.455844123, -4, 0), (0, 0, 270))):
                Circle(SKETCH_37_R, mode=Mode.SUBTRACT)
            with Locations(Location((33.455844123, -10, 0), (0, 0, 270))):
                Circle(SKETCH_37_R, mode=Mode.SUBTRACT)
            with Locations(Location((39.213203436, 8, 0), (0, 0, 180))):
                Circle(SKETCH_37_R_2, mode=Mode.SUBTRACT)
            with Locations(Location((89.213203436, 8, 0), (0, 0, 180))):
                Circle(SKETCH_37_R_2, mode=Mode.SUBTRACT)
            with Locations(Location((101.213203436, -25, 0), (0, 0, 180))):
                Circle(SKETCH_37_R_2, mode=Mode.SUBTRACT)
            with Locations(Location((27.213203436, -25, 0), (0, 0, 180))):
                Circle(SKETCH_37_R_2, mode=Mode.SUBTRACT)
            with Locations(Location((42.213203436, -25, 0), (0, 0, 180))):
                Circle(SKETCH_37_R_2, mode=Mode.SUBTRACT)
            with Locations(Location((86.213203436, -25, 0), (0, 0, 180))):
                Circle(SKETCH_37_R_2, mode=Mode.SUBTRACT)
            with Locations(Location((101.213203436, -35, 0), (0, 0, 180))):
                Circle(SKETCH_37_R_2, mode=Mode.SUBTRACT)
            with Locations(Location((27.213203436, -35, 0), (0, 0, 180))):
                Circle(SKETCH_37_R_2, mode=Mode.SUBTRACT)
            with Locations(Location((29.958503265, -60.9, 0), (0, 0, 180))):
                Circle(SKETCH_37_R_2, mode=Mode.SUBTRACT)
            with Locations(Location((98.467903606, -60.9, 0), (0, 0, 180))):
                Circle(SKETCH_37_R_2, mode=Mode.SUBTRACT)
            with Locations(Location((89.213203436, -115, 0), (0, 0, 180))):
                Circle(SKETCH_37_R_2, mode=Mode.SUBTRACT)
            with Locations(Location((39.213203436, -115, 0), (0, 0, 180))):
                Circle(SKETCH_37_R_2, mode=Mode.SUBTRACT)
            with Locations(Location((27.213203436, -115, 0), (0, 0, 180))):
                Circle(SKETCH_37_R_2, mode=Mode.SUBTRACT)
            with Locations(Location((27.213203436, -105, 0), (0, 0, 180))):
                Circle(SKETCH_37_R_2, mode=Mode.SUBTRACT)
            with Locations(Location((101.213203436, -105, 0), (0, 0, 180))):
                Circle(SKETCH_37_R_2, mode=Mode.SUBTRACT)
            with Locations(Location((101.213203436, -115, 0), (0, 0, 180))):
                Circle(SKETCH_37_R_2, mode=Mode.SUBTRACT)
            with BuildLine():
                Line((77.189845619, 3), (51.236561252, 3))
                ThreePointArc((51.236561252, 3), (47.701027346, 1.535533906), (46.236561252, -2))
                Line((46.236561252, -2), (46.236561252, -12))
                ThreePointArc((46.236561252, -12), (47.701027346, -15.535533906), (51.236561252, -17))
                Line((51.236561252, -17), (77.189845619, -17))
                ThreePointArc((77.189845619, -17), (80.725379525, -15.535533906), (82.189845619, -12))
                Line((82.189845619, -12), (82.189845619, -2))
                ThreePointArc((82.189845619, -2), (80.725379525, 1.535533906), (77.189845619, 3))
            make_face(mode=Mode.SUBTRACT)
            with BuildLine():
                Line((37.461162407, -36), (37.461162407, -104.5))
                ThreePointArc((37.461162407, -104.5), (38.925628501, -108.035533906), (42.461162407, -109.5))
                Line((42.461162407, -109.5), (85.965244464, -109.5))
                ThreePointArc((85.965244464, -109.5), (89.50077837, -108.035533906), (90.965244464, -104.5))
                Line((90.965244464, -104.5), (90.965244464, -36))
                ThreePointArc((90.965244464, -36), (89.793671589, -33.171572875), (86.965244464, -32))
                Line((86.965244464, -32), (41.461162407, -32))
                ThreePointArc((41.461162407, -32), (38.632735282, -33.171572875), (37.461162407, -36))
            make_face(mode=Mode.SUBTRACT)
        extrude(amount=-EXTRUDE_8_DEPTH)

    # 圆角6
    fillet_6_edges = [part.edges().sort_by_distance(p)[0] for p in [
        (28.455844123, 19.713203436, 12),
        (99.970562748, 19.713203436, 12),
    ]]
    fillet(fillet_6_edges, radius=FILLET_6_R)


solid = part.part
